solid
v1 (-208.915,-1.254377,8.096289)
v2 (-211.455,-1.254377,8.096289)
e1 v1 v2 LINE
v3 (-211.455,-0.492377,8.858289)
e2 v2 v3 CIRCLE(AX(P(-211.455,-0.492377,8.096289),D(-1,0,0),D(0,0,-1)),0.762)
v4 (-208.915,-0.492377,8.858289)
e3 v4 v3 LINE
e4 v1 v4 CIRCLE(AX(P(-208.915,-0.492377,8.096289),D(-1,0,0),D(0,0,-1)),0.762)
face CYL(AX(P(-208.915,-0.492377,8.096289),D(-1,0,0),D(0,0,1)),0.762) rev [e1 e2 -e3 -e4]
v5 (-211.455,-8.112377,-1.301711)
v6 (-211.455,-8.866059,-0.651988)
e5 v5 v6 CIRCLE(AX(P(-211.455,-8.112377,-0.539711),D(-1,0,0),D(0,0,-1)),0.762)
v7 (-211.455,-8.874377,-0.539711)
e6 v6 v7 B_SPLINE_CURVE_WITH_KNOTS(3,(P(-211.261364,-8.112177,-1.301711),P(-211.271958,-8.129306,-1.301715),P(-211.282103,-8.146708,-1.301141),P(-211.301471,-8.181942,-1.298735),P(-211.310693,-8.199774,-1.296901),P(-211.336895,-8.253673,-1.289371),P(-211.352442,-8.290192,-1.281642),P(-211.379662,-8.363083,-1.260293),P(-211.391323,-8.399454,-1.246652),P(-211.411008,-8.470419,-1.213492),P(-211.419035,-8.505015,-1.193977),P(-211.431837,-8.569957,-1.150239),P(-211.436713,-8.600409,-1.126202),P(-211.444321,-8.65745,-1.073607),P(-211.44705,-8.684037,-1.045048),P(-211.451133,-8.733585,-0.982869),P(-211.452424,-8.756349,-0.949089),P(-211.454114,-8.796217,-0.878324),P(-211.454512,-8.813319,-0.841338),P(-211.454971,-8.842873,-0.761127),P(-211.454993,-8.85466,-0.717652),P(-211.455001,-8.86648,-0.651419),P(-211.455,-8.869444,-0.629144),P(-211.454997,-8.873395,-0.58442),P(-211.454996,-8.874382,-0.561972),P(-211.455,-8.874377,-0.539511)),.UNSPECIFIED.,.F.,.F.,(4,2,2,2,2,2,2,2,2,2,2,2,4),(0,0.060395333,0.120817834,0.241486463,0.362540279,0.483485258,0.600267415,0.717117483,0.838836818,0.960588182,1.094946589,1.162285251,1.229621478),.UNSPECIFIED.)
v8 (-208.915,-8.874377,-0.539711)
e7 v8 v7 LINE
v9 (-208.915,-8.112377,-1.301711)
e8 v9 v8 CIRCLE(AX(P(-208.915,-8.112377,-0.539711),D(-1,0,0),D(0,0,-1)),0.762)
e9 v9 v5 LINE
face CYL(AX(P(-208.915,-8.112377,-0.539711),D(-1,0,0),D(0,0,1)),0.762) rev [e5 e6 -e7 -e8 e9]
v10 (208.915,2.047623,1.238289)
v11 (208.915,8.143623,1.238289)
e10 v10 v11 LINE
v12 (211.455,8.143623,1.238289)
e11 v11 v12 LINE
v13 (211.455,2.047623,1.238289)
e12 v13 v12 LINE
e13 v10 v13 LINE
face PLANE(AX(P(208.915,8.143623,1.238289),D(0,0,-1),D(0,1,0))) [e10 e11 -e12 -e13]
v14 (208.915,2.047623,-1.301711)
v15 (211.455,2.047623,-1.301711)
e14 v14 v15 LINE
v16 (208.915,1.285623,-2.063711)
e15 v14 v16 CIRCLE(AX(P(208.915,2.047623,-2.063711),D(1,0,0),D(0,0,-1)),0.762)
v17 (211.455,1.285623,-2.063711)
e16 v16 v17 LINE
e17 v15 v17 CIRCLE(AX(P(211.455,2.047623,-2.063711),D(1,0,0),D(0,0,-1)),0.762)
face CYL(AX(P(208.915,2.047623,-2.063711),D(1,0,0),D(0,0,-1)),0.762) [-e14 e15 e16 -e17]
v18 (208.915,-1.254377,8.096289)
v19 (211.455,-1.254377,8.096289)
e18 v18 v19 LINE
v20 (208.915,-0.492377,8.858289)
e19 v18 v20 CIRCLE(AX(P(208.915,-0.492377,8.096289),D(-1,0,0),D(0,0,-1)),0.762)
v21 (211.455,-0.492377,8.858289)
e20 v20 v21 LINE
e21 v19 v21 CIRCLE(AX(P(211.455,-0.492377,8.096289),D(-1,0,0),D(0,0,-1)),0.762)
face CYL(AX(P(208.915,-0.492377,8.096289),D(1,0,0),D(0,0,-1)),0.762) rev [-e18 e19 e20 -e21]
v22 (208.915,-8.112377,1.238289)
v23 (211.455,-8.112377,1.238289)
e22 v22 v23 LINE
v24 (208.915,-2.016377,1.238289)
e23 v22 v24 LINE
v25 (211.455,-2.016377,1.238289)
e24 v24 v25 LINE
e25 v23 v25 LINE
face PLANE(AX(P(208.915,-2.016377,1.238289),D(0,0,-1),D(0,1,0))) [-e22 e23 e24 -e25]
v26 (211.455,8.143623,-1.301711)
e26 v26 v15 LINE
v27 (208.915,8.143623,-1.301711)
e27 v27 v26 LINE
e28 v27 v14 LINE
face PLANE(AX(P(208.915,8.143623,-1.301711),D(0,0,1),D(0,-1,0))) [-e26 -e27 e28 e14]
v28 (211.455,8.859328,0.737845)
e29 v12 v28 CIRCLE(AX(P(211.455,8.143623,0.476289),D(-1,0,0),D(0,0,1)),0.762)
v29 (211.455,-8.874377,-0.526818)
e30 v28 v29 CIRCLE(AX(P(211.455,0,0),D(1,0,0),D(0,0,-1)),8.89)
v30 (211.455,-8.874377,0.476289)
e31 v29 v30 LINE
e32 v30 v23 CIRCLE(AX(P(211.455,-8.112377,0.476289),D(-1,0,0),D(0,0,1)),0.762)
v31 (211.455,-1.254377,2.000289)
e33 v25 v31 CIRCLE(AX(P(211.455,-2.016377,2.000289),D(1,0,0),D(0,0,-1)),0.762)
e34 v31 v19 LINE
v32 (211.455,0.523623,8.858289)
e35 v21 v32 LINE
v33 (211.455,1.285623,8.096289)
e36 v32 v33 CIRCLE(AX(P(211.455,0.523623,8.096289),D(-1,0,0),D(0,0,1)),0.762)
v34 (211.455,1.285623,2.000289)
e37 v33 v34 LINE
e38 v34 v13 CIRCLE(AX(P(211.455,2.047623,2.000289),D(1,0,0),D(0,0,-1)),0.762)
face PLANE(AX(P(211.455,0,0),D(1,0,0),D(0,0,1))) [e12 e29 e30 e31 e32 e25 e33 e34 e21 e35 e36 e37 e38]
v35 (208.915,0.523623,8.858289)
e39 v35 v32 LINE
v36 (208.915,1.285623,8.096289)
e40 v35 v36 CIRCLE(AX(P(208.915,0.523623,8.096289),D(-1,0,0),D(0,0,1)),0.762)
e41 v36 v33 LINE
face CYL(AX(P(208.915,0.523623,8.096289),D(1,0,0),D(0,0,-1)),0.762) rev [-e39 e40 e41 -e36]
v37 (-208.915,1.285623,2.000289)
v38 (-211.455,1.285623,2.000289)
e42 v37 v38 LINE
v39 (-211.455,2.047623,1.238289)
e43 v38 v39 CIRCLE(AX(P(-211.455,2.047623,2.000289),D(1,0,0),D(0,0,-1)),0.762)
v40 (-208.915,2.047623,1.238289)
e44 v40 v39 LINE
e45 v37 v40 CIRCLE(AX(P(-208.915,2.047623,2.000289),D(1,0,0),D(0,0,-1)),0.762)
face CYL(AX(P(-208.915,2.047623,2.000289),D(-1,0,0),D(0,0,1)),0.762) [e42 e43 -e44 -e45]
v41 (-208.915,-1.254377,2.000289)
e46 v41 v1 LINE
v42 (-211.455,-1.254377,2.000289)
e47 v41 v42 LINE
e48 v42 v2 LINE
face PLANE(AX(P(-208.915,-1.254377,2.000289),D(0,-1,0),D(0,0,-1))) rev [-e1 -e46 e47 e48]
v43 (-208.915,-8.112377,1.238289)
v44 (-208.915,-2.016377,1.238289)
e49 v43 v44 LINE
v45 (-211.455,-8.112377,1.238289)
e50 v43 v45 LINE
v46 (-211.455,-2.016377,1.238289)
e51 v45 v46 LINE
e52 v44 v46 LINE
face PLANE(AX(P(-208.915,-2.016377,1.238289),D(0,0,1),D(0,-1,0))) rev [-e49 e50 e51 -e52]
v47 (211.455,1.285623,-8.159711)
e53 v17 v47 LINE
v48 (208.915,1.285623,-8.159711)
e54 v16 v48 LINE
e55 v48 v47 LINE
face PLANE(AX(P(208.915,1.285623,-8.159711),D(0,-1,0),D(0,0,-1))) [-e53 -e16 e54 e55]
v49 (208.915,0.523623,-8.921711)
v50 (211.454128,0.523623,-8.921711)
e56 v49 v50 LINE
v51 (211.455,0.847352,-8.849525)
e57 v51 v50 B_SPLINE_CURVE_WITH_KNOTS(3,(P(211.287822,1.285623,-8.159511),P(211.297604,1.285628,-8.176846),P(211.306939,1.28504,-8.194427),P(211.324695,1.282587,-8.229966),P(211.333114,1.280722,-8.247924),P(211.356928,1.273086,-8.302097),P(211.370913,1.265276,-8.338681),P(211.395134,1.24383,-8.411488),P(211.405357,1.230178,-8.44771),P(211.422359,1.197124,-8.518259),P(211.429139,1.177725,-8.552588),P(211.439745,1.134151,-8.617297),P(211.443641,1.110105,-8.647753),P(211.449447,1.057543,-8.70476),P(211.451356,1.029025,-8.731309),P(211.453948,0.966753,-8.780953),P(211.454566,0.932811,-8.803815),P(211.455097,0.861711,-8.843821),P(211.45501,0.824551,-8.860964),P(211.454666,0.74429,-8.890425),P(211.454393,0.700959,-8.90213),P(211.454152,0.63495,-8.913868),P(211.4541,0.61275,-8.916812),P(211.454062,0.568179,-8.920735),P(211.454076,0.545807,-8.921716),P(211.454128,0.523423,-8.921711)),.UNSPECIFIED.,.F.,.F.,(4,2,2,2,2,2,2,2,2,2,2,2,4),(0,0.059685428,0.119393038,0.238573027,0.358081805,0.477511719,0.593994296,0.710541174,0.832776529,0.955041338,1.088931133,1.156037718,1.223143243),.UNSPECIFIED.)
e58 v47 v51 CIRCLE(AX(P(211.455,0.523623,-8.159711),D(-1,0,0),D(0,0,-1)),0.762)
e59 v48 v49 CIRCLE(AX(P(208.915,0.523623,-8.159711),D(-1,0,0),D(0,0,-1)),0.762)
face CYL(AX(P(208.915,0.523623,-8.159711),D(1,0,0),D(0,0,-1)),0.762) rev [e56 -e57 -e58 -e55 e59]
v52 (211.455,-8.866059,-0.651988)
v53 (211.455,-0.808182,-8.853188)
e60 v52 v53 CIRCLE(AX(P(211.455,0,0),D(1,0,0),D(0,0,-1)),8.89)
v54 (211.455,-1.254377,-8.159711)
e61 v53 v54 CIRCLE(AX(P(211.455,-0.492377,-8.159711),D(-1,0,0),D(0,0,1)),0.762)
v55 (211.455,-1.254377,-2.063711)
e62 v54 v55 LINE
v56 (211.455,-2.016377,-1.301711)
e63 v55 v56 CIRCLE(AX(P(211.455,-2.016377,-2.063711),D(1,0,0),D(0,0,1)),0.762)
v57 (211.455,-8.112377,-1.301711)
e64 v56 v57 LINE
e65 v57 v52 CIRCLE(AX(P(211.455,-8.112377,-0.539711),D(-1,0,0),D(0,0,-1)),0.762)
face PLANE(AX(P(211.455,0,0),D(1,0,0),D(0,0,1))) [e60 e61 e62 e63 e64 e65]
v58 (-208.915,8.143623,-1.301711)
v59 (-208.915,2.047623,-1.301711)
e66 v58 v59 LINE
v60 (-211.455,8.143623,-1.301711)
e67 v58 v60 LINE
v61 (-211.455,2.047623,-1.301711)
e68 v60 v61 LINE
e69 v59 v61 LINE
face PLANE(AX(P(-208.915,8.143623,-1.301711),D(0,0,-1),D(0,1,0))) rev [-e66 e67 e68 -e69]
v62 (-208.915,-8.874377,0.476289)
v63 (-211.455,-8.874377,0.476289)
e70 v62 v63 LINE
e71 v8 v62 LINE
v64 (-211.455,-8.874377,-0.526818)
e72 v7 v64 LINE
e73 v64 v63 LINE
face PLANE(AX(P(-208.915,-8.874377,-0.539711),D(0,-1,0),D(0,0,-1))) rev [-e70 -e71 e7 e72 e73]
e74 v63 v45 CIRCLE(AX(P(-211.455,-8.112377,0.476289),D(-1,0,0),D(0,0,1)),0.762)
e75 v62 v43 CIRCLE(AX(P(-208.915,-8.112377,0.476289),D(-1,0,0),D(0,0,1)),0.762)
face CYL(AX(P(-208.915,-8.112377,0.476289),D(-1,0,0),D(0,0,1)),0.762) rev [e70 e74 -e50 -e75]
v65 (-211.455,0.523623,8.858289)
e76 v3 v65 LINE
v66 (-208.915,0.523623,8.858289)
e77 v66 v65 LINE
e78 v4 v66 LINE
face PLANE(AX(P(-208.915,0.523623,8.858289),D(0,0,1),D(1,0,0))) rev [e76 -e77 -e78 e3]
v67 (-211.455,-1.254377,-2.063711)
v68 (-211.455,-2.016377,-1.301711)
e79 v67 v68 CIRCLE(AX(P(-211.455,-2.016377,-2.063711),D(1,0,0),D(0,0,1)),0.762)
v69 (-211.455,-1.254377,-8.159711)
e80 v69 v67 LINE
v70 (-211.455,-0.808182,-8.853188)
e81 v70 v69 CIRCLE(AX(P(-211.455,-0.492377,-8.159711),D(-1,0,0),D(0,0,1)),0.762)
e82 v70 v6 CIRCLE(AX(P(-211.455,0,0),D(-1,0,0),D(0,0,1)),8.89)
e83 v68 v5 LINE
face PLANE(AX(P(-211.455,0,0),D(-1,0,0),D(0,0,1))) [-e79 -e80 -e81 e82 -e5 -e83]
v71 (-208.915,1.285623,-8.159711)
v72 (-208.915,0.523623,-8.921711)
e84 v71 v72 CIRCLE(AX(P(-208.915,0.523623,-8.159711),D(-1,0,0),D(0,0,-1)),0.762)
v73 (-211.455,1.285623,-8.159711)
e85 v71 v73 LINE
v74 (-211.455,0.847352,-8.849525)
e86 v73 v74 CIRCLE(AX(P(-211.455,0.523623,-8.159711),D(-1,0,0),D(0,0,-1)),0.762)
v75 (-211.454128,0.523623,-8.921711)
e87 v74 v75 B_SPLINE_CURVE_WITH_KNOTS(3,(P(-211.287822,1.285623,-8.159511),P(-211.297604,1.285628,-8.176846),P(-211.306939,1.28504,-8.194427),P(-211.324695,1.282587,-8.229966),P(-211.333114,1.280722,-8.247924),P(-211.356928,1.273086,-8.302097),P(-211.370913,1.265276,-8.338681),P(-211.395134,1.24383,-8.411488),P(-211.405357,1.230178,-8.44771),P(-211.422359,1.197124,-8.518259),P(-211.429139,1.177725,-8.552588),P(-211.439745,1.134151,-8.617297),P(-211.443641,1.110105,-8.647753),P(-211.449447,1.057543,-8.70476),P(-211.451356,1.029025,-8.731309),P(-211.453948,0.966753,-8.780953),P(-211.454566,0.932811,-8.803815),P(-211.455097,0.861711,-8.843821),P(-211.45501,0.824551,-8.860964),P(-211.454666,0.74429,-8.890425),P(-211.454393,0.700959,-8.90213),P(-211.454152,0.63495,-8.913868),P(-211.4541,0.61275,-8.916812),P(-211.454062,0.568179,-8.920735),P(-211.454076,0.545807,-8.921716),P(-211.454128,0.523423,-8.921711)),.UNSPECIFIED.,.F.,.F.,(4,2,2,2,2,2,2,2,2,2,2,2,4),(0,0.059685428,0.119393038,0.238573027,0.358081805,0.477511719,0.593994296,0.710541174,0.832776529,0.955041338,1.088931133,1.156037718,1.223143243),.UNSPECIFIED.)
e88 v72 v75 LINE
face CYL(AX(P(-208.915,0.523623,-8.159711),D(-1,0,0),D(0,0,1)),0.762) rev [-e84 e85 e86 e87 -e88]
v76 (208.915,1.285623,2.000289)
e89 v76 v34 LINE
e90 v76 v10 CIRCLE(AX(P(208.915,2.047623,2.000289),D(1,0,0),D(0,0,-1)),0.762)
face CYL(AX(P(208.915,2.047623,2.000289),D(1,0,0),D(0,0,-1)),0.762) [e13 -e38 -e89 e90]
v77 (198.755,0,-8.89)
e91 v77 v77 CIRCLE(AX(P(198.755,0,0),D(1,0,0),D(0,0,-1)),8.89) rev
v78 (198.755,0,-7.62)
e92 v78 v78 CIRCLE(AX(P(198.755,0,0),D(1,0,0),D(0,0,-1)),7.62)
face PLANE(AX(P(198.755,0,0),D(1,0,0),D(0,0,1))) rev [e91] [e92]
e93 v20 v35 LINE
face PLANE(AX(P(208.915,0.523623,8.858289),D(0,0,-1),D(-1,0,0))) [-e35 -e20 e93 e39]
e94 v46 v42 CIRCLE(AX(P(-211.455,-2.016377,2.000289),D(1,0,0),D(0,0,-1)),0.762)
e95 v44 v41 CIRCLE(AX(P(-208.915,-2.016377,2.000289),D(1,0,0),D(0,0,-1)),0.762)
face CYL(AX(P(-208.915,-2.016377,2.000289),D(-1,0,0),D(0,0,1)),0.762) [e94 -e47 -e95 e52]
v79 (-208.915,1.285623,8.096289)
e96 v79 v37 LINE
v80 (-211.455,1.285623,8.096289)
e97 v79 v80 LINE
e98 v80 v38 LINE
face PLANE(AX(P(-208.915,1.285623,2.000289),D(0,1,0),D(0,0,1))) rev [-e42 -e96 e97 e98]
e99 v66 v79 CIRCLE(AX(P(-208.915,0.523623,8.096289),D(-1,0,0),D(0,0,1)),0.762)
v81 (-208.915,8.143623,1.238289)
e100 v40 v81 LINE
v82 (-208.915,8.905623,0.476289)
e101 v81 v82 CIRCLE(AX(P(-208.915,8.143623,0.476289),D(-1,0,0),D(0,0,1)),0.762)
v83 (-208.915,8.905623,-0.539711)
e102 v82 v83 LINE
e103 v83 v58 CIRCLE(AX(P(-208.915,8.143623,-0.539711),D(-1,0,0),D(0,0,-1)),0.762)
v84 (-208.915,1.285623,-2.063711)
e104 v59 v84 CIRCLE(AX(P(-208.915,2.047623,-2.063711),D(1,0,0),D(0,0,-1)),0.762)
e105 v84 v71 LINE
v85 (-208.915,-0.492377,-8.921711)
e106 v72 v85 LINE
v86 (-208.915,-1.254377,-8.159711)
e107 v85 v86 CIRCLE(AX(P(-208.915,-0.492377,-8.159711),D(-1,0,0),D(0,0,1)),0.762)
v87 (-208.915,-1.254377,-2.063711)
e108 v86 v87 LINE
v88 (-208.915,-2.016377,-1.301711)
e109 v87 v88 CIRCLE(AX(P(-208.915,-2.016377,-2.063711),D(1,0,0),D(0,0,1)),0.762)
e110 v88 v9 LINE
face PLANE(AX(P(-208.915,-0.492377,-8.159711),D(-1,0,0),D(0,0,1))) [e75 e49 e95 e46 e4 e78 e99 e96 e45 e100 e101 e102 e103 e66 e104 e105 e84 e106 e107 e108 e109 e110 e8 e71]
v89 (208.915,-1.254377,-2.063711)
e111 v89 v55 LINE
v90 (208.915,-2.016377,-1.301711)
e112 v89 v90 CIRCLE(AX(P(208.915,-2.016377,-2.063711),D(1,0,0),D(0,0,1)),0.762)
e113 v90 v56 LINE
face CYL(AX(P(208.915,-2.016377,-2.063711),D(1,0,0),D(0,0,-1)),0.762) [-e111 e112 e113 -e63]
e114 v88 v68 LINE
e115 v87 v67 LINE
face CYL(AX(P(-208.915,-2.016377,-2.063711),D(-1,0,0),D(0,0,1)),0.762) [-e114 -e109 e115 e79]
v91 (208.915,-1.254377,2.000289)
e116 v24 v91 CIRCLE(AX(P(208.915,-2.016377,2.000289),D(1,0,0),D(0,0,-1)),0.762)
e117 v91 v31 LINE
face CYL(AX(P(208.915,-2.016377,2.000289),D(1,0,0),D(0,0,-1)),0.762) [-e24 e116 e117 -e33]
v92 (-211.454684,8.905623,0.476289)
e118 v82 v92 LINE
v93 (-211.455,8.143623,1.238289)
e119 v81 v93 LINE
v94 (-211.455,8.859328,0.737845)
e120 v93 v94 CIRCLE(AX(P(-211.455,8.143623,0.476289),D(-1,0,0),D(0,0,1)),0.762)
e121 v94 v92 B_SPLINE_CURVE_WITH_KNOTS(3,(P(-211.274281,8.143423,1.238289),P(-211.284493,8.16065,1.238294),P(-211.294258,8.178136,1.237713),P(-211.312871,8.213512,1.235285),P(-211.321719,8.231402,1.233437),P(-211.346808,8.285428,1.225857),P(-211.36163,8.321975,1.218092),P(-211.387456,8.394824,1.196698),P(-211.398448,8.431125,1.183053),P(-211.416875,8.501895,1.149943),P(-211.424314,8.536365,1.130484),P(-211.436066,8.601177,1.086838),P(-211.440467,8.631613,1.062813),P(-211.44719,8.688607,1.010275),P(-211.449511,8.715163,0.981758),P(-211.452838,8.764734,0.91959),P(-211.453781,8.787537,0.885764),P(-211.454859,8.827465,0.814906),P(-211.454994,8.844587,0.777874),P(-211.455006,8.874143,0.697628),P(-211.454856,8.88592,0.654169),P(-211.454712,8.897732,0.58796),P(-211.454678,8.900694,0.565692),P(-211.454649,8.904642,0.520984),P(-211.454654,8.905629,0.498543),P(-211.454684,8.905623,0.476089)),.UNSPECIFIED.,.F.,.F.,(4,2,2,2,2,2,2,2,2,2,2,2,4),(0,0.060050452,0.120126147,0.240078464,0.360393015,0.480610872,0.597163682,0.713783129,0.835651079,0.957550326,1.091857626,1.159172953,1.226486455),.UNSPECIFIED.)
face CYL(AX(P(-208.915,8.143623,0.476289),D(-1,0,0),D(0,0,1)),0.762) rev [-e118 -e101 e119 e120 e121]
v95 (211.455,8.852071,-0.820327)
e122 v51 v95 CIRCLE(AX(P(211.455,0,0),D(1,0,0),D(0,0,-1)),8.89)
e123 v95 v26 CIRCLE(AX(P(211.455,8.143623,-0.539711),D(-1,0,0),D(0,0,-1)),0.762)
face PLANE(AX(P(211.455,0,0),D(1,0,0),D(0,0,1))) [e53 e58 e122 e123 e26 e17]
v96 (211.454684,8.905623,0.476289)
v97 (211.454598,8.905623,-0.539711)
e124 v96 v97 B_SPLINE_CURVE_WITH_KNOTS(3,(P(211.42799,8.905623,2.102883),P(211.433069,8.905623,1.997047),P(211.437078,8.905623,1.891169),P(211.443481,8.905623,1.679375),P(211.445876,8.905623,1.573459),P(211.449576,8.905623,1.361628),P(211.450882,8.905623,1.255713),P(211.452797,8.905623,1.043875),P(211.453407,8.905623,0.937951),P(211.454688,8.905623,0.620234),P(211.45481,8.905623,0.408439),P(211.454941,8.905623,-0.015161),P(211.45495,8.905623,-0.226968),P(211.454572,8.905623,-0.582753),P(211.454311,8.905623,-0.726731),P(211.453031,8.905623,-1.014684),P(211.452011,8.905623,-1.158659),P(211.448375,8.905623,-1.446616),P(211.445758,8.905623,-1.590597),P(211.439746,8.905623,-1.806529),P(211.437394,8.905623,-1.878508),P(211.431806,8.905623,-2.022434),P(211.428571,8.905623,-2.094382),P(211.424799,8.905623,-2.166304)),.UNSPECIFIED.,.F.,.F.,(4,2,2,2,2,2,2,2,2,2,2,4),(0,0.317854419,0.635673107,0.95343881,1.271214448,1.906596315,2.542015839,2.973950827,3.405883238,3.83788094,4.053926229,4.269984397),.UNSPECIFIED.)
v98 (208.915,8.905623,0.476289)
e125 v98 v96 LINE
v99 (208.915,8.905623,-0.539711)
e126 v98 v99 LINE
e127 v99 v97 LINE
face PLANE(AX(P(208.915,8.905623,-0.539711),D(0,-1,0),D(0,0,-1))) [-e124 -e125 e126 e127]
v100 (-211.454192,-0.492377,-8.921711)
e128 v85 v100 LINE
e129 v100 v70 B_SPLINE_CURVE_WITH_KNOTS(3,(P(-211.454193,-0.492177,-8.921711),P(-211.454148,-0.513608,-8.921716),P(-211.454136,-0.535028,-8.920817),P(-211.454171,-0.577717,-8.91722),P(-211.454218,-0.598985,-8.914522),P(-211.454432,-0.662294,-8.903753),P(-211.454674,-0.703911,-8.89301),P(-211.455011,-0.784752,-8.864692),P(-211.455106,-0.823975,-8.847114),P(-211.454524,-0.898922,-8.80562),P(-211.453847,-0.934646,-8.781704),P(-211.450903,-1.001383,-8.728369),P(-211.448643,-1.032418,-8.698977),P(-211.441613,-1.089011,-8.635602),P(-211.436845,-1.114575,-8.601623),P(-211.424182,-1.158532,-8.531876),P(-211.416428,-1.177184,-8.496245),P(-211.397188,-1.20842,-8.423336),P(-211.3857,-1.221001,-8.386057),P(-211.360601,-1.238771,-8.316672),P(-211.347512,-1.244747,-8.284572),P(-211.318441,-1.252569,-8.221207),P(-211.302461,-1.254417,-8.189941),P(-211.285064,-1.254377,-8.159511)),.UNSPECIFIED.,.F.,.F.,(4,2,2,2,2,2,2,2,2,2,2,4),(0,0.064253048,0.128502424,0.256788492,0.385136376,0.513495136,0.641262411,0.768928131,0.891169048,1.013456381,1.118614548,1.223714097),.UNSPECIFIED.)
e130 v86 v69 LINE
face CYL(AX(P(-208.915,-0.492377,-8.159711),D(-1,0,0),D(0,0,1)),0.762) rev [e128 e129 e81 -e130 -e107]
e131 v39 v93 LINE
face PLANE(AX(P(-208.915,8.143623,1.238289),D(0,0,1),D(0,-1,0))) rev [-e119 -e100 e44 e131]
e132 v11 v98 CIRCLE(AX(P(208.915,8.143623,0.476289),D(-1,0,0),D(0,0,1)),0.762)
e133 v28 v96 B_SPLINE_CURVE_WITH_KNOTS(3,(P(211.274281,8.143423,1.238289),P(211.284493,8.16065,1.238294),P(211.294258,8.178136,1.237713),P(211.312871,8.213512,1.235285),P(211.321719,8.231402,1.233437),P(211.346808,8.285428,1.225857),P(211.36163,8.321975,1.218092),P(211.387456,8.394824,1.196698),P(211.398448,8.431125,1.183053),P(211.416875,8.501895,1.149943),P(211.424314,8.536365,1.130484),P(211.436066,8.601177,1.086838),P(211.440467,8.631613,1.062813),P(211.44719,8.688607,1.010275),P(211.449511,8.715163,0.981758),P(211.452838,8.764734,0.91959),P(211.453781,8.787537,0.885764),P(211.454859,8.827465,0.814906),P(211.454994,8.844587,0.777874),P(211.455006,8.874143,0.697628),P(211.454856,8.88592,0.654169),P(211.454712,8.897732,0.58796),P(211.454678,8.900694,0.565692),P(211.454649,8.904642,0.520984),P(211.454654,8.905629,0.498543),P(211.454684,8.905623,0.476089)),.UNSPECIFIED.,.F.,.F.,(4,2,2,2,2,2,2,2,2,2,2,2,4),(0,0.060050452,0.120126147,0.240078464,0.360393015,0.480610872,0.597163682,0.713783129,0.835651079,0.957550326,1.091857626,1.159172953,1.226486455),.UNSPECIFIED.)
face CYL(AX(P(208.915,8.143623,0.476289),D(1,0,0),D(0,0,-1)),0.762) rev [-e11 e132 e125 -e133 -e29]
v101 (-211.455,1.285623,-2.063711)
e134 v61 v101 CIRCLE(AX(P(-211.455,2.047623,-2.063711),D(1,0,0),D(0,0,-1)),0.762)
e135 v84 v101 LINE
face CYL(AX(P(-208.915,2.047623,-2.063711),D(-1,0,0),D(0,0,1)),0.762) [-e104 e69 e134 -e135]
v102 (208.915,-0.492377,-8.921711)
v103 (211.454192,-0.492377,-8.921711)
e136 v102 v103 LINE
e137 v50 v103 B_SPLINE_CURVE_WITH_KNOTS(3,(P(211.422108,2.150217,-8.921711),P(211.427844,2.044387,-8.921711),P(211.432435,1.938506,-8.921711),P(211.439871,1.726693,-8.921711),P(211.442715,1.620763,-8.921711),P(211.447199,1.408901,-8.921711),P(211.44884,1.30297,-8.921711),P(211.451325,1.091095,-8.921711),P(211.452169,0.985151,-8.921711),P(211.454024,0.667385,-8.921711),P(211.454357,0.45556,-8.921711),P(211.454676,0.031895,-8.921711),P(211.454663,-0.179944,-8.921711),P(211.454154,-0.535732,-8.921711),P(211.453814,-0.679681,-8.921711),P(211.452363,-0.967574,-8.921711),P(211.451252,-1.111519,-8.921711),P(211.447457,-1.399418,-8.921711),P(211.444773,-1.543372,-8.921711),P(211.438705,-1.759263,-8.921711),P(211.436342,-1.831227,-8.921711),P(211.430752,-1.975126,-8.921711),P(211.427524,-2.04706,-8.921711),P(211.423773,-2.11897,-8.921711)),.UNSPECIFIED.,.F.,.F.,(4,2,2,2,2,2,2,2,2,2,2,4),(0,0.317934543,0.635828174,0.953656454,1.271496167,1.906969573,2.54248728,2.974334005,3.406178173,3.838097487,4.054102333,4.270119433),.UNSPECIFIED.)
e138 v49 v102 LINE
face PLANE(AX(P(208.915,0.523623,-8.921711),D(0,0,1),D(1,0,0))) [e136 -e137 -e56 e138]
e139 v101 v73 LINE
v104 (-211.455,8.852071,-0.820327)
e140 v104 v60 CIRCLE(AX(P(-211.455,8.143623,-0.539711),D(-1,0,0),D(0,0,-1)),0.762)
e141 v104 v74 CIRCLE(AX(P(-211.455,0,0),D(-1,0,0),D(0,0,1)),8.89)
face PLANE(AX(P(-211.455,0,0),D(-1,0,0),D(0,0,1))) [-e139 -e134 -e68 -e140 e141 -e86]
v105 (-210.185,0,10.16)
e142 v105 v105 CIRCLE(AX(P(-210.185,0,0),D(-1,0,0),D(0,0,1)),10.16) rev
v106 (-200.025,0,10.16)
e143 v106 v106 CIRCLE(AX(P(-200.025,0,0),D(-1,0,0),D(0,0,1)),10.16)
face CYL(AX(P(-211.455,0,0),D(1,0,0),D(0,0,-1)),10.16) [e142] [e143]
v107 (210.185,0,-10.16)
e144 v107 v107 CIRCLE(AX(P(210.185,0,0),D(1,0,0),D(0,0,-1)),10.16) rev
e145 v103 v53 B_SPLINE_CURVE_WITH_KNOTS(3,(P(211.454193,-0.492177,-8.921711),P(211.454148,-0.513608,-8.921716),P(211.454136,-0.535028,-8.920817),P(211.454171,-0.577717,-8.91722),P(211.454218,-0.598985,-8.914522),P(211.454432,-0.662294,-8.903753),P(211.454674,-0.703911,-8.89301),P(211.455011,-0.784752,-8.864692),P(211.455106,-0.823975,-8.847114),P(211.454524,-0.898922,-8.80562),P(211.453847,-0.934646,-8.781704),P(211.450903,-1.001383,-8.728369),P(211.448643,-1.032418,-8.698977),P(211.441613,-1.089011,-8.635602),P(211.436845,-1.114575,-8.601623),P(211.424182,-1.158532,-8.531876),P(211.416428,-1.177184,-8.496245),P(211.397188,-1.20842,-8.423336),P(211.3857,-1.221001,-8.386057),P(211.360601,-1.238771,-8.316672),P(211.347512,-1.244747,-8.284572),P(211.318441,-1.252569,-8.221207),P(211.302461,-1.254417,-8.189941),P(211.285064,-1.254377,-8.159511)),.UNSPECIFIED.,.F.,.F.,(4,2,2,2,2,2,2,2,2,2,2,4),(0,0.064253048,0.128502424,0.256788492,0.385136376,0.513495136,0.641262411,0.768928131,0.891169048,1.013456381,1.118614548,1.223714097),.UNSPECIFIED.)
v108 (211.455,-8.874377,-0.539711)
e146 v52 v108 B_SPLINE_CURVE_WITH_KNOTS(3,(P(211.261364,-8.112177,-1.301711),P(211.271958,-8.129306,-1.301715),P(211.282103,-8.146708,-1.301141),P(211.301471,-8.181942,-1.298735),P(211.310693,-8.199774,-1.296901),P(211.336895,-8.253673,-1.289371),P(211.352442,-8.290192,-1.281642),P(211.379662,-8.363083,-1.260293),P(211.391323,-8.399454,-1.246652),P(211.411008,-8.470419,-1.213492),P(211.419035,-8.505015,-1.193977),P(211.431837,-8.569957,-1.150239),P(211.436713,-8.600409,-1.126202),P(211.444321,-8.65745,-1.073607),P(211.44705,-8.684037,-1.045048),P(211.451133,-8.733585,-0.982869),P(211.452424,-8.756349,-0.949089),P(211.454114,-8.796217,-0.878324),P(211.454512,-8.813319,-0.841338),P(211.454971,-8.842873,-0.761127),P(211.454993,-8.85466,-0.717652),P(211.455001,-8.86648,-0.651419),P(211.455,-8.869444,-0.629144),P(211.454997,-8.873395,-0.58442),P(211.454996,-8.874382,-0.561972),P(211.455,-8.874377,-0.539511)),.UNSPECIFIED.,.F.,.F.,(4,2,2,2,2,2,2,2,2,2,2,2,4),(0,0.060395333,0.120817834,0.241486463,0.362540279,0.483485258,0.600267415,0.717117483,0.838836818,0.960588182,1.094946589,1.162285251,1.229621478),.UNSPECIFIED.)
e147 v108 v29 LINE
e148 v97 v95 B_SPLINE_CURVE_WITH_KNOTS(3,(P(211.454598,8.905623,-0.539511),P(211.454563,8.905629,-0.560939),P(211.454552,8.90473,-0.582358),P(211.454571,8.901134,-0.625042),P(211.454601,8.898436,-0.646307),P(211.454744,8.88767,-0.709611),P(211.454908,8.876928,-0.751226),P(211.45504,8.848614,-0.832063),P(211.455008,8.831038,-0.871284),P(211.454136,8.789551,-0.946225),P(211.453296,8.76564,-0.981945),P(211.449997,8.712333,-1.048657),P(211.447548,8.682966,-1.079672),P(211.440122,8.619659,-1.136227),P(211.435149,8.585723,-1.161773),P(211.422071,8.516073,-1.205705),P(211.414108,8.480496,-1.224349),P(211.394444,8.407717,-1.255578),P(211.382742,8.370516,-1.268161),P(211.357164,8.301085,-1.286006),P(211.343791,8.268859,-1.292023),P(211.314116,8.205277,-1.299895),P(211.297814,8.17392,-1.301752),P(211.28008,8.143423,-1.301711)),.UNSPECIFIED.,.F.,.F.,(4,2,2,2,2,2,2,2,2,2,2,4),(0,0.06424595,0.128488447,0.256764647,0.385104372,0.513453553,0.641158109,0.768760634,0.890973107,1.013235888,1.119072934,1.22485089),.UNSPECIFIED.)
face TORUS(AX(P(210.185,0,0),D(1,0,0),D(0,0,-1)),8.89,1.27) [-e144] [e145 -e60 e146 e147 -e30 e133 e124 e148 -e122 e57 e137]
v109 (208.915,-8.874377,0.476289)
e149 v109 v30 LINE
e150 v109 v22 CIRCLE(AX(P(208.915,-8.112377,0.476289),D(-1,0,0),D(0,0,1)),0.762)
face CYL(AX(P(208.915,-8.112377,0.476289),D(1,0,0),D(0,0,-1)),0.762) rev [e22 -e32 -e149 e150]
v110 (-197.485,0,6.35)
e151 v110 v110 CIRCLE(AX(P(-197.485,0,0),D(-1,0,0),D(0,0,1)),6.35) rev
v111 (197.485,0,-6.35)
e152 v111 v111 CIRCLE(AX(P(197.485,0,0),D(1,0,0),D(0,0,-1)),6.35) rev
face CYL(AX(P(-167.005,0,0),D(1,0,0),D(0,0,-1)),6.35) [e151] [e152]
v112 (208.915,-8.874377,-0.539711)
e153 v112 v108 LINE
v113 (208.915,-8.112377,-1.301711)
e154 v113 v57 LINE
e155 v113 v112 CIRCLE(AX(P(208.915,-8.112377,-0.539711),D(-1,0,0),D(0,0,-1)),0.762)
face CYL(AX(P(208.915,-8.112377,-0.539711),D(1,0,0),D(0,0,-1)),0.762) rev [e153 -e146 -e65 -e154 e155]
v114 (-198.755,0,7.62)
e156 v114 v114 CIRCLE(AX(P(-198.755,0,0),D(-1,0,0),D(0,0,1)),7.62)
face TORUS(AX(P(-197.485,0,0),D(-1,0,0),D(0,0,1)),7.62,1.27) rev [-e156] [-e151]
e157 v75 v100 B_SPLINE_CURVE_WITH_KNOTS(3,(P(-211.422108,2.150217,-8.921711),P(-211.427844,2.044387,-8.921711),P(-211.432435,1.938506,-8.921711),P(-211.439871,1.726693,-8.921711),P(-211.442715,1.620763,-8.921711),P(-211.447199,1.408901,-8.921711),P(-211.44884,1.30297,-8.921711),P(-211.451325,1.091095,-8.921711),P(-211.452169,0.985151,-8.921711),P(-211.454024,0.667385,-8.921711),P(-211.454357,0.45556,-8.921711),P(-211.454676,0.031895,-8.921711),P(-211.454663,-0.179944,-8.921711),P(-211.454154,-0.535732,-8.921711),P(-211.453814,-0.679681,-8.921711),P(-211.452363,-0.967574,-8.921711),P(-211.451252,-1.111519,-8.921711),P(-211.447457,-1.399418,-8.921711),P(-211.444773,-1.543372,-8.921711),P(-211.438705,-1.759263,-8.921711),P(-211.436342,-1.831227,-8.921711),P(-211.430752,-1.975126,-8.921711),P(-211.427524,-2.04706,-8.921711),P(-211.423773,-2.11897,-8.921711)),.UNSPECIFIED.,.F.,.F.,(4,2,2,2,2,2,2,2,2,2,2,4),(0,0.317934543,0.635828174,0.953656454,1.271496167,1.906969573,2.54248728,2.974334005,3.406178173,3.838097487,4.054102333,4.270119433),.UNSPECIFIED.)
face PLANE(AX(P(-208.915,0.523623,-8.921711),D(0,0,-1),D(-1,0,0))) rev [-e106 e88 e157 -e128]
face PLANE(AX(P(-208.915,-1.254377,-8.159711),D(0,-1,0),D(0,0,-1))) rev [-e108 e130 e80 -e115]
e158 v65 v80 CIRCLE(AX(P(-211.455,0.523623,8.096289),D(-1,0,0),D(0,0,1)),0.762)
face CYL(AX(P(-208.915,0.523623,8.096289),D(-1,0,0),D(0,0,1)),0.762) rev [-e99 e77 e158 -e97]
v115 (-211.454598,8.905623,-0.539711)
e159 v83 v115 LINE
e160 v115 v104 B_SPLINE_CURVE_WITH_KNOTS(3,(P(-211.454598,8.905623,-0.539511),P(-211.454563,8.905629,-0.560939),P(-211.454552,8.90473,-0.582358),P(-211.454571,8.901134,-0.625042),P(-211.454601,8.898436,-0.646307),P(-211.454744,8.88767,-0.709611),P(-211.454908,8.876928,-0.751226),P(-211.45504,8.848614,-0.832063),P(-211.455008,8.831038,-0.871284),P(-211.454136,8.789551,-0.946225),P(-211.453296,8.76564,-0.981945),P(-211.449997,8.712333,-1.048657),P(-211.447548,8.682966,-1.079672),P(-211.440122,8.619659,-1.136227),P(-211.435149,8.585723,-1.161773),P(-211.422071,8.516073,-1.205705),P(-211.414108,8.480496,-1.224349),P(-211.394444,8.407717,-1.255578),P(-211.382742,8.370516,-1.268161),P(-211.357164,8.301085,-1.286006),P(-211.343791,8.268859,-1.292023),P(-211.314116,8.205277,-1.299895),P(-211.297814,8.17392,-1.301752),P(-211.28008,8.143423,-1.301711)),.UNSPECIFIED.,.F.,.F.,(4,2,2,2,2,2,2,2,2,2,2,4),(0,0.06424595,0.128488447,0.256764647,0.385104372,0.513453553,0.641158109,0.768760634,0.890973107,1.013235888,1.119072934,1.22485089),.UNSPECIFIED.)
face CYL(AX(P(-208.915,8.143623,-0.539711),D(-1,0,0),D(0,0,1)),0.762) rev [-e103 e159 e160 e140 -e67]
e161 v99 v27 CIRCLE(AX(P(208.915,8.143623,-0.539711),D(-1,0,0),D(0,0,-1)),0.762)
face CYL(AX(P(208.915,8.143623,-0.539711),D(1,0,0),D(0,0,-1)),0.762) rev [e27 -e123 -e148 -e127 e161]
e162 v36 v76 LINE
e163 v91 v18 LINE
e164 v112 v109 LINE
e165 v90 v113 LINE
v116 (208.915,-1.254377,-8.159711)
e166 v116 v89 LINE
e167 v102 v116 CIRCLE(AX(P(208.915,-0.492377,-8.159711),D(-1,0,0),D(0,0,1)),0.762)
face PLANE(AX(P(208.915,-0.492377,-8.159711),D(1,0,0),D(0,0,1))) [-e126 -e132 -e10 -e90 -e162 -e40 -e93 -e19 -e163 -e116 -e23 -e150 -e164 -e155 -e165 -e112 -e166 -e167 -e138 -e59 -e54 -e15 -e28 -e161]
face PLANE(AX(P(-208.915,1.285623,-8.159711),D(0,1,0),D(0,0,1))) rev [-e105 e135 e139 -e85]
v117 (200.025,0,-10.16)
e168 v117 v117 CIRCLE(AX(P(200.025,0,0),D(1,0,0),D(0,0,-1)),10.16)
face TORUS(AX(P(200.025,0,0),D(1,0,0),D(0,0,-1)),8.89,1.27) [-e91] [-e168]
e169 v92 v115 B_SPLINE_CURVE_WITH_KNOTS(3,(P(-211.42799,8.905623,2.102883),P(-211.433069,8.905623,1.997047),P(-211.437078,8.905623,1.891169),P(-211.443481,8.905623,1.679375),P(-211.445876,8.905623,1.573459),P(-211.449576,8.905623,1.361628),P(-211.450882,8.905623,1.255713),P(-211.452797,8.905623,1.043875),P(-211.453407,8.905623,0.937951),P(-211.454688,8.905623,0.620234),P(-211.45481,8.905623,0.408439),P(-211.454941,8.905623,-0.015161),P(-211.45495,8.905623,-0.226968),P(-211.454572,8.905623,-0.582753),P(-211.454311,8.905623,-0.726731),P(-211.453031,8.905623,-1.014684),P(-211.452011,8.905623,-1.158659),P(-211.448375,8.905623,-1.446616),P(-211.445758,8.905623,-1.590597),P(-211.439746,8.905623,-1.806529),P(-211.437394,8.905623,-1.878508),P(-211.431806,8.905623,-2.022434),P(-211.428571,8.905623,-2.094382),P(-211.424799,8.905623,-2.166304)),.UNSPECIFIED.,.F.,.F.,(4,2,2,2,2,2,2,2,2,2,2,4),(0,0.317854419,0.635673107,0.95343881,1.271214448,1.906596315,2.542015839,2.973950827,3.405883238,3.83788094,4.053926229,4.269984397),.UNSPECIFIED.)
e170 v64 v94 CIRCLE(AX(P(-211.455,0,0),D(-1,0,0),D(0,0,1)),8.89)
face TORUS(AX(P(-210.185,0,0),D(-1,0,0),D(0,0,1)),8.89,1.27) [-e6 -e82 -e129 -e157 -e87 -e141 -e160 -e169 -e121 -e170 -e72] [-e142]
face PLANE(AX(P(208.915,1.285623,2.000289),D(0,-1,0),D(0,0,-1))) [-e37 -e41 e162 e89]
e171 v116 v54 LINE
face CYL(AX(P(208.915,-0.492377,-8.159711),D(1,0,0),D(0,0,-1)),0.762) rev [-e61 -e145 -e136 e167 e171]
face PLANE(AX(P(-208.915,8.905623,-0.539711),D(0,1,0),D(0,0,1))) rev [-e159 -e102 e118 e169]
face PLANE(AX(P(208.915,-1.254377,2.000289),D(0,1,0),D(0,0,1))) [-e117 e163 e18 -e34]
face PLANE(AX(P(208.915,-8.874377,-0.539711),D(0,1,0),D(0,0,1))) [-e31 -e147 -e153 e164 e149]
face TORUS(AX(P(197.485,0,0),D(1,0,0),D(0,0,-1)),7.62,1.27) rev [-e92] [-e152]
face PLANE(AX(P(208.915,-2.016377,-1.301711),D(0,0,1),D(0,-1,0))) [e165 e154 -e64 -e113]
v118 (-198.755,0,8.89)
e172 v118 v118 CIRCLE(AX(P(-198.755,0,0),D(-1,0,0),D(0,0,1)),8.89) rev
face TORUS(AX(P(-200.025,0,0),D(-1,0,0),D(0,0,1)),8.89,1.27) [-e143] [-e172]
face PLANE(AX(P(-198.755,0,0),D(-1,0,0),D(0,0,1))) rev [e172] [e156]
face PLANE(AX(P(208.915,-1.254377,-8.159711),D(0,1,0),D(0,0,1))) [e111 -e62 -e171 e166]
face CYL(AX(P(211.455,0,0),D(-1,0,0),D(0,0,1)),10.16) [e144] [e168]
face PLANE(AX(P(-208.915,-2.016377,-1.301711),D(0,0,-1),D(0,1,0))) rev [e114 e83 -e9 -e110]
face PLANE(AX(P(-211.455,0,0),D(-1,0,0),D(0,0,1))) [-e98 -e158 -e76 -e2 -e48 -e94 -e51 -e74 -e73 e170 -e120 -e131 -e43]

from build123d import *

# Parameters (mm, degrees)
BOSS_EXTRUDE1_DEPTH      = 167.005
BOSS_EXTRUDE1_DEPTH_BACK = 167.005
SKETCH1_R                = 6.35
SKETCH2_R                = 6.35
BOSS_EXTRUDE2_DEPTH      = 31.75
SKETCH3_R                = 10.16
BOSS_EXTRUDE3_DEPTH      = 12.7
FILLET3_R                = 1.27
CUT_EXTRUDE1_DEPTH       = 2.54


# Read off the part's stored shape, not the designer's step: Mirror1
with BuildPart() as part:
    # Sketch1 → Boss-Extrude1 (new, two sides: drawn at the far end of the back side and taken through both)
    with BuildSketch(Plane(origin=(0, 0, 0), x_dir=(0, 0, -1), z_dir=(1, 0, 0)).offset(-BOSS_EXTRUDE1_DEPTH_BACK)):
        Circle(SKETCH1_R)
    extrude(amount=BOSS_EXTRUDE1_DEPTH + BOSS_EXTRUDE1_DEPTH_BACK)

    # Sketch2 → Boss-Extrude2 (add)
    with BuildSketch(Plane.ZY.offset(167.005)):
        with Locations(Location((0, 0, 0), (0, 0, 180))):
            Circle(SKETCH2_R)
    extrude(amount=BOSS_EXTRUDE2_DEPTH)

    # Sketch3 → Boss-Extrude3 (add)
    with BuildSketch(Plane.ZY.offset(198.755)):
        Circle(SKETCH3_R)
    extrude(amount=BOSS_EXTRUDE3_DEPTH)

    # Fillet3
    fillet3_edges = [part.edges().sort_by_distance(p)[0] for p in [
        (-198.755, 0, -10.16),
        (-211.455, 0, -10.16),
        (-198.755, 0, 6.35),
    ]]
    fillet(fillet3_edges, radius=FILLET3_R)

    # Sketch4 → Cut-Extrude1 (cut)
    with BuildSketch(Plane.ZY.offset(211.455)):
        with BuildLine():
            Line((-0.539710702, 8.905623261), (0.476289298, 8.905623261))
            ThreePointArc((0.476289298, 8.905623261), (1.015104666, 8.682438628), (1.238289298, 8.143623261))
            Line((1.238289298, 8.143623261), (1.238289298, 2.047623261))
            ThreePointArc((1.238289298, 2.047623261), (1.461473931, 1.508807894), (2.000289298, 1.285623261))
            Line((2.000289298, 1.285623261), (8.096289298, 1.285623261))
            ThreePointArc((8.096289298, 1.285623261), (8.635104666, 1.062438628), (8.858289298, 0.523623261))
            Line((8.858289298, 0.523623261), (8.858289298, -0.492376739))
            ThreePointArc((8.858289298, -0.492376739), (8.635104666, -1.031192106), (8.096289298, -1.254376739))
            Line((8.096289298, -1.254376739), (2.000289298, -1.254376739))
            ThreePointArc((2.000289298, -1.254376739), (1.461473931, -1.477561372), (1.238289298, -2.016376739))
            Line((1.238289298, -2.016376739), (1.238289298, -8.112376739))
            ThreePointArc((1.238289298, -8.112376739), (1.015104666, -8.651192106), (0.476289298, -8.874376739))
            Line((0.476289298, -8.874376739), (-0.539710702, -8.874376739))
            ThreePointArc((-0.539710702, -8.874376739), (-1.078526069, -8.651192106), (-1.301710702, -8.112376739))
            Line((-1.301710702, -8.112376739), (-1.301710702, -2.016376739))
            ThreePointArc((-1.301710702, -2.016376739), (-1.524895334, -1.477561372), (-2.063710702, -1.254376739))
            Line((-2.063710702, -1.254376739), (-8.159710702, -1.254376739))
            ThreePointArc((-8.159710702, -1.254376739), (-8.698526069, -1.031192106), (-8.921710702, -0.492376739))
            Line((-8.921710702, -0.492376739), (-8.921710702, 0.523623261))
            ThreePointArc((-8.921710702, 0.523623261), (-8.698526069, 1.062438628), (-8.159710702, 1.285623261))
            Line((-8.159710702, 1.285623261), (-2.063710702, 1.285623261))
            ThreePointArc((-2.063710702, 1.285623261), (-1.524895334, 1.508807894), (-1.301710702, 2.047623261))
            Line((-1.301710702, 2.047623261), (-1.301710702, 8.143623261))
            ThreePointArc((-1.301710702, 8.143623261), (-1.078526069, 8.682438628), (-0.539710702, 8.905623261))
        make_face()
    extrude(amount=-CUT_EXTRUDE1_DEPTH, mode=Mode.SUBTRACT)

    # Mirror1: part across plane


with BuildPart() as part_1:
    add(part.part)
    add(part.part.mirror(Plane(origin=(0, 0, 0), x_dir=(0, 0, 1), z_dir=(1, 0, 0))))


solid = part_1.part
